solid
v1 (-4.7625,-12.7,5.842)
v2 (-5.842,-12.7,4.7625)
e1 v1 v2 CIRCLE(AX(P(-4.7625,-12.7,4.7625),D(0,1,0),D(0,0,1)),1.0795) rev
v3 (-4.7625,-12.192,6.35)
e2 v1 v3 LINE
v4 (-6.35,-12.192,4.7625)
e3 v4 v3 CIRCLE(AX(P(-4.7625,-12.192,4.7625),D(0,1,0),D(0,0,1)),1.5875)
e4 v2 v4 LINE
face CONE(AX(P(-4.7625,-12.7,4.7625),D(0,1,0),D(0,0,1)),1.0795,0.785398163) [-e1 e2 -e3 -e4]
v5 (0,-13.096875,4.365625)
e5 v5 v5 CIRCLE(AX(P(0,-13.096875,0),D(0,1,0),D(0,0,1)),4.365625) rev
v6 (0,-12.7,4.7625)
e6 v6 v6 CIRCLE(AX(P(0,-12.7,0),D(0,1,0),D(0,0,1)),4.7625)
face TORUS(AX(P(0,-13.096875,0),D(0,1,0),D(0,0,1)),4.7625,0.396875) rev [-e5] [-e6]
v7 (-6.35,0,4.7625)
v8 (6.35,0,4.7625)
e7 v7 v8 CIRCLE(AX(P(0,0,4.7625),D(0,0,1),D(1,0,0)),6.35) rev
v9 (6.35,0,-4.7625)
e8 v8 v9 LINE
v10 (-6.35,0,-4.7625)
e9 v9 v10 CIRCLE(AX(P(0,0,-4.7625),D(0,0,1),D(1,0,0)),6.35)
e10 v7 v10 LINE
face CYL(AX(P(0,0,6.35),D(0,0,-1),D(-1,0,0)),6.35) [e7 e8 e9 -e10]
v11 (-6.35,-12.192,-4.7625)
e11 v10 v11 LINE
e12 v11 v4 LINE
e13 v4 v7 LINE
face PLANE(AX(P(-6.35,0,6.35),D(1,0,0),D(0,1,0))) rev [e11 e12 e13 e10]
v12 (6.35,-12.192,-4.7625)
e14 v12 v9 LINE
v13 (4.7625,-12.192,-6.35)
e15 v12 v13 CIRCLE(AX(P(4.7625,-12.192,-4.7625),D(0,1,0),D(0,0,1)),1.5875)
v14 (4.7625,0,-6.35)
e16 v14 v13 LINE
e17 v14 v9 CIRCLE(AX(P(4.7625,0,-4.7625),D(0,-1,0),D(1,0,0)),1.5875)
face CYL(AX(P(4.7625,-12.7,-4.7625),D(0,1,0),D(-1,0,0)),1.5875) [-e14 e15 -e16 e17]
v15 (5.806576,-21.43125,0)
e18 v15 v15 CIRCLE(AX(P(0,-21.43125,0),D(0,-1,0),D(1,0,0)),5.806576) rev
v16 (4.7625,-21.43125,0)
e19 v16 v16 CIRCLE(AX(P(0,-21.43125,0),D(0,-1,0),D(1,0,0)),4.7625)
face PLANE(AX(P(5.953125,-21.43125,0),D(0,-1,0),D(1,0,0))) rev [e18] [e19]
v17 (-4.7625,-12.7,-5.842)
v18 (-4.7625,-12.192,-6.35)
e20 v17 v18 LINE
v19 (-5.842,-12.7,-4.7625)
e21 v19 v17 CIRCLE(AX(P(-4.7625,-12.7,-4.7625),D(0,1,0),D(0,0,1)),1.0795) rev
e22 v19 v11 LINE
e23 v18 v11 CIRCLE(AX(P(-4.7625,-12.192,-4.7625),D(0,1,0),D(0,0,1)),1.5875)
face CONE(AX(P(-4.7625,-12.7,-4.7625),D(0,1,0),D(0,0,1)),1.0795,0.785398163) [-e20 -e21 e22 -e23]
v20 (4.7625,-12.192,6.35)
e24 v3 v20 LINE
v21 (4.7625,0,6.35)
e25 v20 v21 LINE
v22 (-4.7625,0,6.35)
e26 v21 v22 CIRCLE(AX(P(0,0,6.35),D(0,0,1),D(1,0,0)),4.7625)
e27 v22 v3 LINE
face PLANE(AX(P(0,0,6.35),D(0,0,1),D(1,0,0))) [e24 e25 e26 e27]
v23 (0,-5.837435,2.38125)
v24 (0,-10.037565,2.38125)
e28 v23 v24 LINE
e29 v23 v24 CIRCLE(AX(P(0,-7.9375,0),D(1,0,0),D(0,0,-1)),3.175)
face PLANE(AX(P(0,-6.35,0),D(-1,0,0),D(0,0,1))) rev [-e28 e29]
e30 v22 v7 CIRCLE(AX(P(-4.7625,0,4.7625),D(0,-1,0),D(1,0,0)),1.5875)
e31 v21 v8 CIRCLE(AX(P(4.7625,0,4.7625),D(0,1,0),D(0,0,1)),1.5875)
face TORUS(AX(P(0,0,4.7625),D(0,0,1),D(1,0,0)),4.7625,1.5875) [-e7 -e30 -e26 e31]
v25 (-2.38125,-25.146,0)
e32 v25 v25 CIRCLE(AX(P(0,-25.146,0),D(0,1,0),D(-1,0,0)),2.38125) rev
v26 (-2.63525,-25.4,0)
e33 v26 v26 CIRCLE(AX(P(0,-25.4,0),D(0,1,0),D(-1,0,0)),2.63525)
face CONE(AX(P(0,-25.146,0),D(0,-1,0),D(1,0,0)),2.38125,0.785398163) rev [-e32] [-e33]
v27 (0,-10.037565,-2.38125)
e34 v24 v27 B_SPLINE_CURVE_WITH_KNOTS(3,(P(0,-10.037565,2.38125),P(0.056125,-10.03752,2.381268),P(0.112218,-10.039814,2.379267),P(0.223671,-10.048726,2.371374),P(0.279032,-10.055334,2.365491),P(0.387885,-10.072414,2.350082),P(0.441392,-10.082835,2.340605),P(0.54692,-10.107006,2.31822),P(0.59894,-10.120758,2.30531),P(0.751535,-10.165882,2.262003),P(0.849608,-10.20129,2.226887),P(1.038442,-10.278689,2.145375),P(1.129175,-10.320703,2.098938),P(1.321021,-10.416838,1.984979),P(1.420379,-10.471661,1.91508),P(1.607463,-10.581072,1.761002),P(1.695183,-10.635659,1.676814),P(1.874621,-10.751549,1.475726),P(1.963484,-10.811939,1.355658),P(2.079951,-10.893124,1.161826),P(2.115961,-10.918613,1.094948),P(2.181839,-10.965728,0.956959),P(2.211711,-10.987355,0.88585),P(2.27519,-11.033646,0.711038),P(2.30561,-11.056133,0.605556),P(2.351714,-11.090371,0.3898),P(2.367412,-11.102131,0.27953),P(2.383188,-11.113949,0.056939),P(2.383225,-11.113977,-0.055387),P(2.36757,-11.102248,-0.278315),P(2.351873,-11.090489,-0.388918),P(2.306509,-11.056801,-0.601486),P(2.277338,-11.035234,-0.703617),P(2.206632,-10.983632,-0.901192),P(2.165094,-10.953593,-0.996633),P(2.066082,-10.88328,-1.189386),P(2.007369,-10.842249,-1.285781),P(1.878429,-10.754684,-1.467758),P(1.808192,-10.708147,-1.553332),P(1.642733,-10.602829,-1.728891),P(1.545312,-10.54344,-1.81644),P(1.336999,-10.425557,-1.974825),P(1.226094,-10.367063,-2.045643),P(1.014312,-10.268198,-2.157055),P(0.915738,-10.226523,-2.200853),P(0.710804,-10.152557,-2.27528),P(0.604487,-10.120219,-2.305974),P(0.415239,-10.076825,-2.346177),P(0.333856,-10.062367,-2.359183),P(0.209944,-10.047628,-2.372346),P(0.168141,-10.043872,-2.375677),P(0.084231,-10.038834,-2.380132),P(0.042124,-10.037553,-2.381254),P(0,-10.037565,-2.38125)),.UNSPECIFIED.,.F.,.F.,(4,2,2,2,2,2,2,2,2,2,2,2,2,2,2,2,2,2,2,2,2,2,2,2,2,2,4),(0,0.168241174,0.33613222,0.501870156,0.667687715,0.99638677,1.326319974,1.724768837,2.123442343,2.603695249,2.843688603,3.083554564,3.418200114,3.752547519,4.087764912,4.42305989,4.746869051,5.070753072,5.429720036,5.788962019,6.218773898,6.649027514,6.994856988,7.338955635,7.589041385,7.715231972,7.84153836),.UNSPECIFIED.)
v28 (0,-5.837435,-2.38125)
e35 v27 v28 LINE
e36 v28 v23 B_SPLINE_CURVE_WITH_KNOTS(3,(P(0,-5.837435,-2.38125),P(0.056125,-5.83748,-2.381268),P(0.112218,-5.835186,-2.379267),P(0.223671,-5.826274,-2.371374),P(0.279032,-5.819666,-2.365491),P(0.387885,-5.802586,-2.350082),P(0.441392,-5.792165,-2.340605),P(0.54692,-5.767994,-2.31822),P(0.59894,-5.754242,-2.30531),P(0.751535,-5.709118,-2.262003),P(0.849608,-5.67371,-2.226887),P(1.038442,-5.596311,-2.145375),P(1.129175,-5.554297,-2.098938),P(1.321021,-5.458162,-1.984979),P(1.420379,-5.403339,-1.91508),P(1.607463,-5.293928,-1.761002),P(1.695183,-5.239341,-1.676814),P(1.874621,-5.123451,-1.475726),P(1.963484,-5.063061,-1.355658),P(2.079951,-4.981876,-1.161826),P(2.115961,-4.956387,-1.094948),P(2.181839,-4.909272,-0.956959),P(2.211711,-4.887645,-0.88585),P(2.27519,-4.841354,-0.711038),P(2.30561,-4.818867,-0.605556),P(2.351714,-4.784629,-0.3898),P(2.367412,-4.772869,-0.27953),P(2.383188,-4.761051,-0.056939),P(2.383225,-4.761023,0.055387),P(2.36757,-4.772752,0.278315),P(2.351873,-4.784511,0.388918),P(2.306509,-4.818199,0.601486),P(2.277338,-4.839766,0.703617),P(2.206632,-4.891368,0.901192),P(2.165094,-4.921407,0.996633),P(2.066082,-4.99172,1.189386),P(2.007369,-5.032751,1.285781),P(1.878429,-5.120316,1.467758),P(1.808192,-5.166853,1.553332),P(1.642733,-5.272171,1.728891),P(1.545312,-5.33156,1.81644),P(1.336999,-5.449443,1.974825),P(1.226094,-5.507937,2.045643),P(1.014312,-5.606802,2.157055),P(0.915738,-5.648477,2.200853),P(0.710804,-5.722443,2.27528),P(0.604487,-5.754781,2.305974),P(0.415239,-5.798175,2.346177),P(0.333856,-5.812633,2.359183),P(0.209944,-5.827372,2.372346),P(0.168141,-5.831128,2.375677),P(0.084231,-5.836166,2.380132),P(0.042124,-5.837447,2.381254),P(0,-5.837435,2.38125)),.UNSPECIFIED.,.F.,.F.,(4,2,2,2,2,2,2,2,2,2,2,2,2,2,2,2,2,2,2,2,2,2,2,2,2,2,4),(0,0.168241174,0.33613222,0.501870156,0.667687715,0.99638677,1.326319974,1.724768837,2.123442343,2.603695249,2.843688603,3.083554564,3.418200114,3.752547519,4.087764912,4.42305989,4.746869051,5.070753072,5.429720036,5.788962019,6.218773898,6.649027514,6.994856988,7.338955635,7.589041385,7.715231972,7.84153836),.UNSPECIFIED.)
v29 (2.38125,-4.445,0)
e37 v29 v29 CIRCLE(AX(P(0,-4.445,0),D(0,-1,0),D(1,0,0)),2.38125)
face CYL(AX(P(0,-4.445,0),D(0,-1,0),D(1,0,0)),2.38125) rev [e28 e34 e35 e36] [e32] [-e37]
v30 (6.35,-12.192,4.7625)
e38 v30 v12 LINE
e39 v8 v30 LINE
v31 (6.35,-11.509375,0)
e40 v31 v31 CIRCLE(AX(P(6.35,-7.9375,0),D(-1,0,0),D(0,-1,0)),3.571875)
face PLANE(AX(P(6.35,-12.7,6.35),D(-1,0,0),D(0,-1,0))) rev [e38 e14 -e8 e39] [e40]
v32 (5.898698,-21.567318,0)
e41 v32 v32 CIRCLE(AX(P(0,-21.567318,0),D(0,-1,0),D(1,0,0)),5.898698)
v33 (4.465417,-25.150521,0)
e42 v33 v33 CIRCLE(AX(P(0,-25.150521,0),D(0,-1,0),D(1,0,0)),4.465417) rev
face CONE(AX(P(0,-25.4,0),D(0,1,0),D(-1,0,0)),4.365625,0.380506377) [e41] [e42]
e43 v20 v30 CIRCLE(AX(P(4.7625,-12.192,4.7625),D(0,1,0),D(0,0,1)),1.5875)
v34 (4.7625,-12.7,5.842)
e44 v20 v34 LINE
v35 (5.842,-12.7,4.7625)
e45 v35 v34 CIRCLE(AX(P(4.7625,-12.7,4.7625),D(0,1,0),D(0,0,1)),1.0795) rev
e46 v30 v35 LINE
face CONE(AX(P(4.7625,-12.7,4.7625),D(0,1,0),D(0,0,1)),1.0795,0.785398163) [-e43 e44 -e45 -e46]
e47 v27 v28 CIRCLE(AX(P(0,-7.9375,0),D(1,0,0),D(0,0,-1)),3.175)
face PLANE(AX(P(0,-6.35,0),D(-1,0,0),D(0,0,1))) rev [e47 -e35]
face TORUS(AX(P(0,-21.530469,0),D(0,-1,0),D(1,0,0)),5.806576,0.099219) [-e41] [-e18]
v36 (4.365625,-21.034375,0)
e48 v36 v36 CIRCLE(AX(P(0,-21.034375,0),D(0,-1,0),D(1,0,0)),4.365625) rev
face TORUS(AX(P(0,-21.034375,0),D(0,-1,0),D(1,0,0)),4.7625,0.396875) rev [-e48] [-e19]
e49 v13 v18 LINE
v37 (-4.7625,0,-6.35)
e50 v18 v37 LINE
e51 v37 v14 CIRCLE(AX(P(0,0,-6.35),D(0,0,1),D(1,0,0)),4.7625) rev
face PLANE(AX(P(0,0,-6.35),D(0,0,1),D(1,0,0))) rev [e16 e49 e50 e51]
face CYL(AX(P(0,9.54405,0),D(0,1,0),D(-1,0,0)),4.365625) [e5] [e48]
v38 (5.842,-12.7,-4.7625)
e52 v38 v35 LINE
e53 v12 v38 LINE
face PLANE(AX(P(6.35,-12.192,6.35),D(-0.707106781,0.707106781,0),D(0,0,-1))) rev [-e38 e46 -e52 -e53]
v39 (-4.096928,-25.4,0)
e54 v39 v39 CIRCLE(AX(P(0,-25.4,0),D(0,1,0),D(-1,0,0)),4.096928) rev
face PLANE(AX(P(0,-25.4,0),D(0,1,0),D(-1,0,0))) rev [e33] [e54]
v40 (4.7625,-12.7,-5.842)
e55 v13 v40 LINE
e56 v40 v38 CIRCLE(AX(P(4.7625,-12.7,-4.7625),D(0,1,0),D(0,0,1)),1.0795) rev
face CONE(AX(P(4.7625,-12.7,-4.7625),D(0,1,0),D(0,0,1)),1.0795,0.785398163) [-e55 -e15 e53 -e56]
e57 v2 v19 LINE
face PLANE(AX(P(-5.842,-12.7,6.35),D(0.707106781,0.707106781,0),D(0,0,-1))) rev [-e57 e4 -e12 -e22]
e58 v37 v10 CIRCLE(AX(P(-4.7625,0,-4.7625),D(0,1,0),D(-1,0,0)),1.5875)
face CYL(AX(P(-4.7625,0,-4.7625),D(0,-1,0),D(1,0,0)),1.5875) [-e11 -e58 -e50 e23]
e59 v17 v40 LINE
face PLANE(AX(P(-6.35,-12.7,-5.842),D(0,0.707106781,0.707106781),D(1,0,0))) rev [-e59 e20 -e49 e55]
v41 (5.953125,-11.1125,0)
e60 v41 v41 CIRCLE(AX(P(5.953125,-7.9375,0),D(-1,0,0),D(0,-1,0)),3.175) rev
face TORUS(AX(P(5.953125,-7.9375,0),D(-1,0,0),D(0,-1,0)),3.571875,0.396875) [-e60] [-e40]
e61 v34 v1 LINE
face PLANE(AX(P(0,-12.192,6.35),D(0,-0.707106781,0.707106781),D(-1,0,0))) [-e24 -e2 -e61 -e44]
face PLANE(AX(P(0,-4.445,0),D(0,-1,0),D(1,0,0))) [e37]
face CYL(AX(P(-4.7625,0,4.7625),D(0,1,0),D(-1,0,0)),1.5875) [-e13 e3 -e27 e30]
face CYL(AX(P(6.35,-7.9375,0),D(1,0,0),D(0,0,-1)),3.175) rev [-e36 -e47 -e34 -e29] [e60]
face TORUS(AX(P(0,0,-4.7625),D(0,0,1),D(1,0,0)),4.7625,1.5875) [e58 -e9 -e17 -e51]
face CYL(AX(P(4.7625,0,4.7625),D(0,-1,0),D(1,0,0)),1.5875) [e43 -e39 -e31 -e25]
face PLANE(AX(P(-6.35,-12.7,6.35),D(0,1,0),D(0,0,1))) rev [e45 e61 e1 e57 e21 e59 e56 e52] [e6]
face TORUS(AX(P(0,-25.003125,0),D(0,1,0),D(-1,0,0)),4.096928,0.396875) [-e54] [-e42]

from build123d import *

# Parameters (mm, degrees)
BOSS_EXTRUDE1_DEPTH                        = 6.35
SKETCH3_R                                  = 2.38125
CUT_EXTRUDE1_DEPTH                         = 20.955
CBORE_FOR_1_4_SOCKET_SHOULDER_SCREW1_OUT_R = 3.175
CBORE_FOR_1_4_SOCKET_SHOULDER_SCREW1_DEPTH = 6.35
FILLET1_R                                  = 1.5875
FILLET2_R                                  = 0.396875
FILLET3_R                                  = 0.09921875
CHAMFER1_SIZE                              = 0.508
CHAMFER2_SIZE                              = 0.254


# Read off the part's stored shape, not the designer's step: CBORE for 1/4 Socket Shoulder Screw1
with BuildPart() as part:
    # Sketch1 → Boss-Extrude1 (new, symmetric)
    with BuildSketch(Plane.XY):
        with BuildLine():
            Line((-6.35, 0), (-6.35, -12.7))
            Line((-6.35, -12.7), (6.35, -12.7))
            Line((6.35, -12.7), (6.35, 0))
            ThreePointArc((6.35, 0), (0, 6.35), (-6.35, 0))
        make_face()
    extrude(amount=BOSS_EXTRUDE1_DEPTH, both=True)

    # Sketch2 → Revolve1 (revolve)
    with BuildSketch(Plane.XY, mode=Mode.PRIVATE) as revolve1_sk:
        Polygon((0, -12.7), (4.365625, -12.7), (4.365625, -16.66875), (4.365625, -18.25625), (4.365625, -21.43125), (5.953125, -21.43125), (4.365625, -25.4), (0, -25.4), align=None)
    revolve(revolve1_sk.sketch.rotate(Axis((0, 9.54404991, 0), (0, -1, 0)), 180), axis=Axis((0, 9.54404991, 0), (0, -1, 0)))

    # Sketch3 → Cut-Extrude1 (cut)
    with BuildSketch(Plane.XZ.offset(25.4)):
        Circle(SKETCH3_R)
    extrude(amount=-CUT_EXTRUDE1_DEPTH, mode=Mode.SUBTRACT)

    # CBORE for 1/4 Socket Shoulder Screw1 out → CBORE for 1/4 Socket Shoulder Screw1 (cut)
    with BuildSketch(Plane.YZ):
        with Locations((-7.9375, 0)):
            Circle(CBORE_FOR_1_4_SOCKET_SHOULDER_SCREW1_OUT_R)
    extrude(amount=CBORE_FOR_1_4_SOCKET_SHOULDER_SCREW1_DEPTH, mode=Mode.SUBTRACT)

    # Fillet1
    fillet1_edges = [part.edges().sort_by_distance(p)[0] for p in [
        (-6.35, -6.35, -6.35),
        (6.35, -6.35, -6.35),
        (0, 6.35, 6.35),
        (-6.35, -6.35, 6.35),
        (6.35, -6.35, 6.35),
        (0, 6.35, -6.35),
    ]]
    fillet(fillet1_edges, radius=FILLET1_R)

    # Fillet2
    fillet2_edges = [part.edges().sort_by_distance(p)[0] for p in [
        (4.365625, -12.7, 0),
        (4.365625, -21.43125, 0),
        (4.365625, -25.4, 0),
        (6.35, -11.1125, 0),
    ]]
    fillet(fillet2_edges, radius=FILLET2_R)

    # Fillet3
    fillet3_edges = [part.edges().sort_by_distance(p)[0] for p in [
        (5.953125, -21.43125, 0),
    ]]
    fillet(fillet3_edges, radius=FILLET3_R)

    # Chamfer1
    chamfer1_edges = [part.edges().sort_by_distance(p)[0] for p in [
        (6.35, -12.7, 0),
        (0, -12.7, -6.35),
        (0, -12.7, 6.35),
        (-6.35, -12.7, 0),
        (5.885032015, -12.7, 5.885032015),
        (-5.885032015, -12.7, 5.885032015),
        (-5.885032015, -12.7, -5.885032015),
        (5.885032015, -12.7, -5.885032015),
    ]]
    chamfer(chamfer1_edges, length=CHAMFER1_SIZE)

    # Chamfer2
    chamfer2_edges = [part.edges().sort_by_distance(p)[0] for p in [
        (-2.38125, -25.4, 0),
    ]]
    chamfer(chamfer2_edges, length=CHAMFER2_SIZE)


solid = part.part
